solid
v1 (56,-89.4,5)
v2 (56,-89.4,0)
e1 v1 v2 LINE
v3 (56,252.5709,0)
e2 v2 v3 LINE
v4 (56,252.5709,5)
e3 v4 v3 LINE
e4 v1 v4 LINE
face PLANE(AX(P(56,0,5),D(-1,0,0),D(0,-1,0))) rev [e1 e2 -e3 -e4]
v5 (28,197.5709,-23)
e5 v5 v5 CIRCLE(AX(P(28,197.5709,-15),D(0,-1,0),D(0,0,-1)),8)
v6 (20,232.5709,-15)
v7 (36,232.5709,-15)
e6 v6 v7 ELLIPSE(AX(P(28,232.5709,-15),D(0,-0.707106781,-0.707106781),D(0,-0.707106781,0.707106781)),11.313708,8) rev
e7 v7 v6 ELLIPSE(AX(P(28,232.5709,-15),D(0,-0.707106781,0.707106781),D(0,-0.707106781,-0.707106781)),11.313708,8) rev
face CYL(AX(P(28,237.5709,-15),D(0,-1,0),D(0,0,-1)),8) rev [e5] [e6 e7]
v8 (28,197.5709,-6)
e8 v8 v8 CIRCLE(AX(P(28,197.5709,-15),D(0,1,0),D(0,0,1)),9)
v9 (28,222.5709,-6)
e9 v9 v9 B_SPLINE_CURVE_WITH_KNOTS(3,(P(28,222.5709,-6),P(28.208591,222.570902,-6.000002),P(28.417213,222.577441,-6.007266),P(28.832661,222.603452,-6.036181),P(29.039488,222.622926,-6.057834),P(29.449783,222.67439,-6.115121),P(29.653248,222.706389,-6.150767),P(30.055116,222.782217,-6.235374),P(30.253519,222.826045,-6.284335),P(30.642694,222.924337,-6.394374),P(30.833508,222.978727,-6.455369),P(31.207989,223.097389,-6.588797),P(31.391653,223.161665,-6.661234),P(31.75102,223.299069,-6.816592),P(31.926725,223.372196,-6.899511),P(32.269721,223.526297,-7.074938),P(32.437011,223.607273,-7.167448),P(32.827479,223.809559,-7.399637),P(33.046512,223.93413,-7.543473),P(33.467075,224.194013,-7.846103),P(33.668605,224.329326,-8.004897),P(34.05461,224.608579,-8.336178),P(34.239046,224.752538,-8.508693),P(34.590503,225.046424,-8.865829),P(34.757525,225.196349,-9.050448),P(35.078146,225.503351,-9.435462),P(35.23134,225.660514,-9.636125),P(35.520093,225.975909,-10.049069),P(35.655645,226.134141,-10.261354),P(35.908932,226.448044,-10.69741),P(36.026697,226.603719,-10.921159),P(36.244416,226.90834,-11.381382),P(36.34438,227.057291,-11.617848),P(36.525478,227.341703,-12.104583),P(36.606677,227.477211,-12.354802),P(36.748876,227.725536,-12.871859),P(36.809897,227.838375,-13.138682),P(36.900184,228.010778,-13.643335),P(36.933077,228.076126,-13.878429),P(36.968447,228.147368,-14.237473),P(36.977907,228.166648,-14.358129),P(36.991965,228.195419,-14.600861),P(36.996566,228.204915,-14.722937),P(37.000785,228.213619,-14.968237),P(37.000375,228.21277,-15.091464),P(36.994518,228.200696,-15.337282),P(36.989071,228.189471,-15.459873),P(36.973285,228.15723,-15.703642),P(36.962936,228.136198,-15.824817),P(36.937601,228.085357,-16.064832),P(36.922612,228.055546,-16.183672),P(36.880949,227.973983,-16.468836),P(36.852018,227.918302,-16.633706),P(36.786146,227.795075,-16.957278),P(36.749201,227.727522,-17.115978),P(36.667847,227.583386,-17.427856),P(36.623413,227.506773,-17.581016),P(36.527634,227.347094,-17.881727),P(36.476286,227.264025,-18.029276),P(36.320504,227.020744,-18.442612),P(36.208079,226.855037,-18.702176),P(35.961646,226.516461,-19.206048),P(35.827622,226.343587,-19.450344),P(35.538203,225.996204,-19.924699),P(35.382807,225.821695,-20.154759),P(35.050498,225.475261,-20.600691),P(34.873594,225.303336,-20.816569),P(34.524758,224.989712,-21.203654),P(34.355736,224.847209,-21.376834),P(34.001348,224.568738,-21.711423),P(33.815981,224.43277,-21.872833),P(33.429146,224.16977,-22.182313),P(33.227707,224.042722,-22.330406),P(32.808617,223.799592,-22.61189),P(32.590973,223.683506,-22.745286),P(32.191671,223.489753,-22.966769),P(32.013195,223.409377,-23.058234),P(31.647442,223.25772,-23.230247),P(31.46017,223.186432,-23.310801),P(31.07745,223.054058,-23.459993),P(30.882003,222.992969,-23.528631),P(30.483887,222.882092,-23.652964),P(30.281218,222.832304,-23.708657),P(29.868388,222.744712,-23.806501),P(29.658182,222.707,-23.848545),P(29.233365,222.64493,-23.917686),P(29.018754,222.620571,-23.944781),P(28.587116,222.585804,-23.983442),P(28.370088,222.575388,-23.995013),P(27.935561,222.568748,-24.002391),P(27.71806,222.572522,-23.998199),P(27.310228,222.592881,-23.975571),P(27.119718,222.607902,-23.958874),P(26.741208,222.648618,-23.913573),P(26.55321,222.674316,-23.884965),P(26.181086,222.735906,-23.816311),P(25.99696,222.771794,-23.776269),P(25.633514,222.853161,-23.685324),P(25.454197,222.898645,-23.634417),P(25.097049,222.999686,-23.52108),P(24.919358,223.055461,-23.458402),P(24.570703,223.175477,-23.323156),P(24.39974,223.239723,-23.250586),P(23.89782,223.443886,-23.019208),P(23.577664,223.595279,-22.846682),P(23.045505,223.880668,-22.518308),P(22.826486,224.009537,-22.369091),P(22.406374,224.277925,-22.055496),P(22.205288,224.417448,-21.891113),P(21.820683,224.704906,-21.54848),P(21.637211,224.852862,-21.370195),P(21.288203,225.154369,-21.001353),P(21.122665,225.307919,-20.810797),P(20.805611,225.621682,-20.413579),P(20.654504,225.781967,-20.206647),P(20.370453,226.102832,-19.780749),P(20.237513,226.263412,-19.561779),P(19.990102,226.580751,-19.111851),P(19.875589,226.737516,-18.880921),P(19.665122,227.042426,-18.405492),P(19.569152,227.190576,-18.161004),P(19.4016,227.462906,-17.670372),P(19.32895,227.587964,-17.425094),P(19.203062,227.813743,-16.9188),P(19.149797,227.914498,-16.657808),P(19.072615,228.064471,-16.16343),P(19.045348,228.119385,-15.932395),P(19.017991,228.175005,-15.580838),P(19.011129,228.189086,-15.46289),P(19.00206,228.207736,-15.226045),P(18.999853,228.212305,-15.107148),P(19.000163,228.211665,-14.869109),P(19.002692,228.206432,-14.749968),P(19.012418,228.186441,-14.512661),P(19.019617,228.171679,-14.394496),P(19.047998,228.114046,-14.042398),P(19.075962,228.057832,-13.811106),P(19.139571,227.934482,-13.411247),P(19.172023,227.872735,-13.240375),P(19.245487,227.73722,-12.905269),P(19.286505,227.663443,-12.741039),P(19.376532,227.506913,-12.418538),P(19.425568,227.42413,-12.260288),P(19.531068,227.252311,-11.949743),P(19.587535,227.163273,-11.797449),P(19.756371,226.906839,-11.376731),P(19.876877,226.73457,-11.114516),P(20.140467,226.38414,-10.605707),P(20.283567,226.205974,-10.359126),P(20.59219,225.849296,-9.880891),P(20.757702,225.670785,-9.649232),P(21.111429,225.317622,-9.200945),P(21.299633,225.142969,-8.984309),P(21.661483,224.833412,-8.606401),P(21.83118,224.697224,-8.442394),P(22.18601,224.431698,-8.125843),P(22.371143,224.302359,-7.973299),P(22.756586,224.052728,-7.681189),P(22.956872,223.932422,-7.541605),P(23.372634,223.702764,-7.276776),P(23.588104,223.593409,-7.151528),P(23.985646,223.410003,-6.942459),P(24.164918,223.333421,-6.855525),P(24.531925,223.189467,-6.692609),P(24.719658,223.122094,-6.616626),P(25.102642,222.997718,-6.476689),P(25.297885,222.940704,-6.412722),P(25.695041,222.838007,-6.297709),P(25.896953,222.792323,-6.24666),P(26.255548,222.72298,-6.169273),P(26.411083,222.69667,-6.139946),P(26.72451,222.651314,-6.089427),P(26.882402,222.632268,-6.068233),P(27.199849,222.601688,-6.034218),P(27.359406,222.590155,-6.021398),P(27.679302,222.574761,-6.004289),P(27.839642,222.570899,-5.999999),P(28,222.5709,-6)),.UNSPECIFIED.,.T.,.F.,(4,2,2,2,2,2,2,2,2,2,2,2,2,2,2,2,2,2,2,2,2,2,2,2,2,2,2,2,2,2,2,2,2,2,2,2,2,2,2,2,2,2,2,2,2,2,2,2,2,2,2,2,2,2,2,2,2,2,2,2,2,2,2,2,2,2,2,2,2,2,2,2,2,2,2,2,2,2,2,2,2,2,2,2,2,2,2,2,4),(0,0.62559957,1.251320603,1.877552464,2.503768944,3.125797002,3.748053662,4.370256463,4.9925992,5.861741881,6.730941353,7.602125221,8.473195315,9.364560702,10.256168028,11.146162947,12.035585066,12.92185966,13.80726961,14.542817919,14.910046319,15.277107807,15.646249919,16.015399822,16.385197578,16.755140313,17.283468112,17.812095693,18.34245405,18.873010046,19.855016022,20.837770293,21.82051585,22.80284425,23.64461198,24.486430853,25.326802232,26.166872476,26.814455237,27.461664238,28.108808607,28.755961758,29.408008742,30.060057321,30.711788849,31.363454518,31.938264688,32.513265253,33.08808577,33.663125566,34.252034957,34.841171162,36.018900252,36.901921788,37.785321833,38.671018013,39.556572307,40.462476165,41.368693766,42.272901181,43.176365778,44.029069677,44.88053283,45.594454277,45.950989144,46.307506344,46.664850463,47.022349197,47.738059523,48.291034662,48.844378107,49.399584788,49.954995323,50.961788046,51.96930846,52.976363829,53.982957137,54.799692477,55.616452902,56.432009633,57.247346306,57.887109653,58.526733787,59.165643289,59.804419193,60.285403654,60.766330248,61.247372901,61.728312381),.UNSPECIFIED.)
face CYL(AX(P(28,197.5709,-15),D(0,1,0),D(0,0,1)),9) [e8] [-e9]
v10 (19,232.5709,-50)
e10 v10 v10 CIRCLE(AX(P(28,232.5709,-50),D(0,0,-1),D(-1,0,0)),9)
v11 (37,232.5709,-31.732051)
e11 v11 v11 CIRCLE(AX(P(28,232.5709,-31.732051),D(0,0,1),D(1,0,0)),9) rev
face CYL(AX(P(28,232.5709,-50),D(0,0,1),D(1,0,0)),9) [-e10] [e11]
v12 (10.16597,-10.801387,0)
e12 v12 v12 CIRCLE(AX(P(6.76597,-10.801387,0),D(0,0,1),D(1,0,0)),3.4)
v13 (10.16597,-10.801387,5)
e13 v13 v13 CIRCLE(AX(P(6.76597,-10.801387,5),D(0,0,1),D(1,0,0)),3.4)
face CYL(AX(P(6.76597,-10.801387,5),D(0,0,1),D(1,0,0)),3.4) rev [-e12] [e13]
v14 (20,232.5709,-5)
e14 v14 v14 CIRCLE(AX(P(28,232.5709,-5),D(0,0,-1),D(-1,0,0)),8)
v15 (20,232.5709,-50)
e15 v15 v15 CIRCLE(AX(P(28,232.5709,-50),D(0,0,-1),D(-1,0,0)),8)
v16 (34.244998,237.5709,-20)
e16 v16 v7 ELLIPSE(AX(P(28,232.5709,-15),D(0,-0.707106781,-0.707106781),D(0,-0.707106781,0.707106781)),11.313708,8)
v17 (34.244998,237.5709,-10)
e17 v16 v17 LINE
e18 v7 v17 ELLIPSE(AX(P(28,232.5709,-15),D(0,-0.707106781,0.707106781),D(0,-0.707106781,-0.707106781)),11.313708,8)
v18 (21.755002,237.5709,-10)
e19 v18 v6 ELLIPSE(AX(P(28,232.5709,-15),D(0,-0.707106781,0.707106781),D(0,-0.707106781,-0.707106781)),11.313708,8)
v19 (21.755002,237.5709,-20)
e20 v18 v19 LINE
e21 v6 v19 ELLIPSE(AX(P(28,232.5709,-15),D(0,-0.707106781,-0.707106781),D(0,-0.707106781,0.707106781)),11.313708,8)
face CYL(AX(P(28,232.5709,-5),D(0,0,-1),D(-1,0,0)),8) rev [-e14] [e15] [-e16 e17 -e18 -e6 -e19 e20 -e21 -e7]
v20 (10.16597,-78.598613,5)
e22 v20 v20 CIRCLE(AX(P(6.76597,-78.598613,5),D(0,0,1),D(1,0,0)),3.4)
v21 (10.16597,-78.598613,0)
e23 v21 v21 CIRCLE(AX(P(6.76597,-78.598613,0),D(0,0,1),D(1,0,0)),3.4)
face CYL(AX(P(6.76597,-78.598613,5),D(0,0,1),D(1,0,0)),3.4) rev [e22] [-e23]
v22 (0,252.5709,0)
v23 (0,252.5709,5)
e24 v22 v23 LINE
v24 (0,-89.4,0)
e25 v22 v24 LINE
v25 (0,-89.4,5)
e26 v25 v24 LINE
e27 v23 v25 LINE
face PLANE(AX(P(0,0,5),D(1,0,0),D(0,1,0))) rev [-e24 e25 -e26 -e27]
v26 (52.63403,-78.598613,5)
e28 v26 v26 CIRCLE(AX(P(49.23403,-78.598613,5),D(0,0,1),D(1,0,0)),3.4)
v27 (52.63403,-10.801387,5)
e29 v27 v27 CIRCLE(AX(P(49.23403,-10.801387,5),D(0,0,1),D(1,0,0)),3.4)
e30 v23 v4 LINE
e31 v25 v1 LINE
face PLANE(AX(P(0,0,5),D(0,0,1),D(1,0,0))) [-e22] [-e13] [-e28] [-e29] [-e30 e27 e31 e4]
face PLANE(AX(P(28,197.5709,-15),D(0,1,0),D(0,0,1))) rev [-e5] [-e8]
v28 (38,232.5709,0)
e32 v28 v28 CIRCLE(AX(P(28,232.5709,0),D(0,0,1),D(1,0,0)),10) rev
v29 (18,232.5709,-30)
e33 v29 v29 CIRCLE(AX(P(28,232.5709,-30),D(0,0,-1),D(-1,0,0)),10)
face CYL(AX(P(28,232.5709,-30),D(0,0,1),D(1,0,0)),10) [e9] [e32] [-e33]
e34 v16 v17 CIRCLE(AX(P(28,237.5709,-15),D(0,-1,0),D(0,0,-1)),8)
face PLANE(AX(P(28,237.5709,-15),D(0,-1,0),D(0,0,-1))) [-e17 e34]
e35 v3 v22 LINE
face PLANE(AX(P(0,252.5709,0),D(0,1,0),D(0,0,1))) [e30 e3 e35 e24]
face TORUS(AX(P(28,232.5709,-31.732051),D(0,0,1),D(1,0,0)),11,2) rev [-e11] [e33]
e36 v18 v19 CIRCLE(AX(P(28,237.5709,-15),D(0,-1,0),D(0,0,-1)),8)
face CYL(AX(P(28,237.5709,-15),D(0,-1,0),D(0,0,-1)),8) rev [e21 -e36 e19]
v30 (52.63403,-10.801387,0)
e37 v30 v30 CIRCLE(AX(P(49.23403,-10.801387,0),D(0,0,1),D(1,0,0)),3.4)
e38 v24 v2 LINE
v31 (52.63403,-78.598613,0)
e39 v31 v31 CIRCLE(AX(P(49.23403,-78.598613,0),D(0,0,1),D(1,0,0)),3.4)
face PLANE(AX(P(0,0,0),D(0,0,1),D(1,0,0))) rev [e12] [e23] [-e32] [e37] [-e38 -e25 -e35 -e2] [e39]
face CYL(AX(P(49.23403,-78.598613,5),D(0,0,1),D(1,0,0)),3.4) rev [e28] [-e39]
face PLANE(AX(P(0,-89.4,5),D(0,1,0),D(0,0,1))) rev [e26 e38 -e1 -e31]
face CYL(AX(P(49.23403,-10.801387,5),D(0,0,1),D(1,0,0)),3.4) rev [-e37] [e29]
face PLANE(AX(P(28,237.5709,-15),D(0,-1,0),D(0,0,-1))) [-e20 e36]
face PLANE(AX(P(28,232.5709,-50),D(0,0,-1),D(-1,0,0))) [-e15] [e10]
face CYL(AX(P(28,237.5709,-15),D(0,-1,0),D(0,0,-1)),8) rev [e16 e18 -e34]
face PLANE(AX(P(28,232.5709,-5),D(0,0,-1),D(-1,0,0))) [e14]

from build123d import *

# Parameters (mm, degrees)
SKETCH_1_W             = 56
SKETCH_1_H             = 89.4
EXTRUDE_1_DEPTH        = 5
HOLE_WIZARD_M8_2_D     = 6.8
HOLE_WIZARD_M8_2_DEPTH = 19.75
HOLE_WIZARD_M8_2_TIP   = 2.042926105
SKETCH_7_W             = 56
SKETCH_7_H             = 5
EXTRUDE_2_DEPTH        = 252.5709
SKETCH_8_R             = 10
EXTRUDE_3_DEPTH        = 30
SKETCH_9_R             = 9
EXTRUDE_4_DEPTH        = 20
FILLET_1_R             = 2
EXTRUDE_START          = -20
SKETCH_10_R            = 9
EXTRUDE_5_DEPTH        = 35
SKETCH_11_R            = 8
CUT_EXTRUDE_1_DEPTH    = 40
SKETCH_12_R            = 8
CUT_EXTRUDE_2_DEPTH    = 45


with BuildPart() as part:
    # 草图1 → 凸台-拉伸1 (new body)
    with BuildSketch(Plane.XY):
        with Locations((28, -44.7)):
            Rectangle(SKETCH_1_W, SKETCH_1_H)
    extrude(amount=EXTRUDE_1_DEPTH)

    # M8 螺纹孔2
    with Locations(Plane.XY.offset(5)):
        with Locations((49.234030414, -78.598612839), (49.234030414, -10.801387161), (6.765969586, -10.801387161), (6.765969586, -78.598612839)):
            Hole(HOLE_WIZARD_M8_2_D / 2, depth=HOLE_WIZARD_M8_2_DEPTH)
            with Locations((0, 0, -(HOLE_WIZARD_M8_2_DEPTH + HOLE_WIZARD_M8_2_TIP / 2))):  # 118° drill point
                Cone(0, HOLE_WIZARD_M8_2_D / 2, HOLE_WIZARD_M8_2_TIP, mode=Mode.SUBTRACT)

    # 草图7 → 凸台-拉伸2 (add)
    with BuildSketch(Plane(origin=(0, 0, 0), x_dir=(1, 0, 0), z_dir=(0, 1, 0))):
        with Locations((28, -2.5)):
            Rectangle(SKETCH_7_W, SKETCH_7_H)
    extrude(amount=EXTRUDE_2_DEPTH)

    # 草图8 → 凸台-拉伸3 (add)
    with BuildSketch(Plane(origin=(0, 0, 0), x_dir=(-1, 0, 0), z_dir=(0, 0, -1))):
        with Locations(Location((-28, 232.5709, 0), (0, 0, 180))):
            Circle(SKETCH_8_R)
    extrude(amount=EXTRUDE_3_DEPTH)

    # 草图9 → 凸台-拉伸4 (add)
    with BuildSketch(Plane(origin=(0, 0, -30), x_dir=(-1, 0, 0), z_dir=(0, 0, -1))):
        with Locations((-28, 232.5709)):
            Circle(SKETCH_9_R)
    extrude(amount=EXTRUDE_4_DEPTH)

    # 圆角1
    # the kernel refuses this fillet: 2 mm, written as the material it adds along each edge
    with BuildSketch(Plane(origin=(28, 232.5709, -30), x_dir=(-1, 0, 0), z_dir=(0, -1, 0))) as fillet_1_piece_1:
        with BuildLine():
            CenterArc((11, 1.732050808), FILLET_1_R, 180, 60)
            Line((9, 1.732050808), (8.96, 1.732050808))
            Line((8.96, 1.732050808), (8.96, 0))
            Line((8.96, 0), (9, -0.04))
            ThreePointArc((9, -0.04), (9.5, -0.04), (9.98, -0.034641016))
            Line((9.98, -0.034641016), (10, 0))
        make_face()
    revolve(axis=Axis((28, 232.5709, -30), (0, 0, -1)))

    # 草图10 → 凸台-拉伸5 (add)
    with BuildSketch(Plane(origin=(0, 252.5709, 0), x_dir=(1, 0, 0), z_dir=(0, 1, 0)).offset(EXTRUDE_START)):
        with Locations(Location((28, 15, 0), (0, 0, 270))):
            Circle(SKETCH_10_R)
    extrude(amount=-EXTRUDE_5_DEPTH)

    # 草图11 → 切除-拉伸1 (cut)
    with BuildSketch(Plane.XZ.offset(-197.5709)):
        with Locations(Location((28, -15, 0), (0, 0, 270))):
            Circle(SKETCH_11_R)
    extrude(amount=-CUT_EXTRUDE_1_DEPTH, mode=Mode.SUBTRACT)

    # 草图12 → 切除-拉伸2 (cut)
    with BuildSketch(Plane(origin=(0, 0, -50), x_dir=(-1, 0, 0), z_dir=(0, 0, -1))):
        with Locations((-28, 232.5709)):
            Circle(SKETCH_12_R)
    extrude(amount=-CUT_EXTRUDE_2_DEPTH, mode=Mode.SUBTRACT)


solid = part.part
